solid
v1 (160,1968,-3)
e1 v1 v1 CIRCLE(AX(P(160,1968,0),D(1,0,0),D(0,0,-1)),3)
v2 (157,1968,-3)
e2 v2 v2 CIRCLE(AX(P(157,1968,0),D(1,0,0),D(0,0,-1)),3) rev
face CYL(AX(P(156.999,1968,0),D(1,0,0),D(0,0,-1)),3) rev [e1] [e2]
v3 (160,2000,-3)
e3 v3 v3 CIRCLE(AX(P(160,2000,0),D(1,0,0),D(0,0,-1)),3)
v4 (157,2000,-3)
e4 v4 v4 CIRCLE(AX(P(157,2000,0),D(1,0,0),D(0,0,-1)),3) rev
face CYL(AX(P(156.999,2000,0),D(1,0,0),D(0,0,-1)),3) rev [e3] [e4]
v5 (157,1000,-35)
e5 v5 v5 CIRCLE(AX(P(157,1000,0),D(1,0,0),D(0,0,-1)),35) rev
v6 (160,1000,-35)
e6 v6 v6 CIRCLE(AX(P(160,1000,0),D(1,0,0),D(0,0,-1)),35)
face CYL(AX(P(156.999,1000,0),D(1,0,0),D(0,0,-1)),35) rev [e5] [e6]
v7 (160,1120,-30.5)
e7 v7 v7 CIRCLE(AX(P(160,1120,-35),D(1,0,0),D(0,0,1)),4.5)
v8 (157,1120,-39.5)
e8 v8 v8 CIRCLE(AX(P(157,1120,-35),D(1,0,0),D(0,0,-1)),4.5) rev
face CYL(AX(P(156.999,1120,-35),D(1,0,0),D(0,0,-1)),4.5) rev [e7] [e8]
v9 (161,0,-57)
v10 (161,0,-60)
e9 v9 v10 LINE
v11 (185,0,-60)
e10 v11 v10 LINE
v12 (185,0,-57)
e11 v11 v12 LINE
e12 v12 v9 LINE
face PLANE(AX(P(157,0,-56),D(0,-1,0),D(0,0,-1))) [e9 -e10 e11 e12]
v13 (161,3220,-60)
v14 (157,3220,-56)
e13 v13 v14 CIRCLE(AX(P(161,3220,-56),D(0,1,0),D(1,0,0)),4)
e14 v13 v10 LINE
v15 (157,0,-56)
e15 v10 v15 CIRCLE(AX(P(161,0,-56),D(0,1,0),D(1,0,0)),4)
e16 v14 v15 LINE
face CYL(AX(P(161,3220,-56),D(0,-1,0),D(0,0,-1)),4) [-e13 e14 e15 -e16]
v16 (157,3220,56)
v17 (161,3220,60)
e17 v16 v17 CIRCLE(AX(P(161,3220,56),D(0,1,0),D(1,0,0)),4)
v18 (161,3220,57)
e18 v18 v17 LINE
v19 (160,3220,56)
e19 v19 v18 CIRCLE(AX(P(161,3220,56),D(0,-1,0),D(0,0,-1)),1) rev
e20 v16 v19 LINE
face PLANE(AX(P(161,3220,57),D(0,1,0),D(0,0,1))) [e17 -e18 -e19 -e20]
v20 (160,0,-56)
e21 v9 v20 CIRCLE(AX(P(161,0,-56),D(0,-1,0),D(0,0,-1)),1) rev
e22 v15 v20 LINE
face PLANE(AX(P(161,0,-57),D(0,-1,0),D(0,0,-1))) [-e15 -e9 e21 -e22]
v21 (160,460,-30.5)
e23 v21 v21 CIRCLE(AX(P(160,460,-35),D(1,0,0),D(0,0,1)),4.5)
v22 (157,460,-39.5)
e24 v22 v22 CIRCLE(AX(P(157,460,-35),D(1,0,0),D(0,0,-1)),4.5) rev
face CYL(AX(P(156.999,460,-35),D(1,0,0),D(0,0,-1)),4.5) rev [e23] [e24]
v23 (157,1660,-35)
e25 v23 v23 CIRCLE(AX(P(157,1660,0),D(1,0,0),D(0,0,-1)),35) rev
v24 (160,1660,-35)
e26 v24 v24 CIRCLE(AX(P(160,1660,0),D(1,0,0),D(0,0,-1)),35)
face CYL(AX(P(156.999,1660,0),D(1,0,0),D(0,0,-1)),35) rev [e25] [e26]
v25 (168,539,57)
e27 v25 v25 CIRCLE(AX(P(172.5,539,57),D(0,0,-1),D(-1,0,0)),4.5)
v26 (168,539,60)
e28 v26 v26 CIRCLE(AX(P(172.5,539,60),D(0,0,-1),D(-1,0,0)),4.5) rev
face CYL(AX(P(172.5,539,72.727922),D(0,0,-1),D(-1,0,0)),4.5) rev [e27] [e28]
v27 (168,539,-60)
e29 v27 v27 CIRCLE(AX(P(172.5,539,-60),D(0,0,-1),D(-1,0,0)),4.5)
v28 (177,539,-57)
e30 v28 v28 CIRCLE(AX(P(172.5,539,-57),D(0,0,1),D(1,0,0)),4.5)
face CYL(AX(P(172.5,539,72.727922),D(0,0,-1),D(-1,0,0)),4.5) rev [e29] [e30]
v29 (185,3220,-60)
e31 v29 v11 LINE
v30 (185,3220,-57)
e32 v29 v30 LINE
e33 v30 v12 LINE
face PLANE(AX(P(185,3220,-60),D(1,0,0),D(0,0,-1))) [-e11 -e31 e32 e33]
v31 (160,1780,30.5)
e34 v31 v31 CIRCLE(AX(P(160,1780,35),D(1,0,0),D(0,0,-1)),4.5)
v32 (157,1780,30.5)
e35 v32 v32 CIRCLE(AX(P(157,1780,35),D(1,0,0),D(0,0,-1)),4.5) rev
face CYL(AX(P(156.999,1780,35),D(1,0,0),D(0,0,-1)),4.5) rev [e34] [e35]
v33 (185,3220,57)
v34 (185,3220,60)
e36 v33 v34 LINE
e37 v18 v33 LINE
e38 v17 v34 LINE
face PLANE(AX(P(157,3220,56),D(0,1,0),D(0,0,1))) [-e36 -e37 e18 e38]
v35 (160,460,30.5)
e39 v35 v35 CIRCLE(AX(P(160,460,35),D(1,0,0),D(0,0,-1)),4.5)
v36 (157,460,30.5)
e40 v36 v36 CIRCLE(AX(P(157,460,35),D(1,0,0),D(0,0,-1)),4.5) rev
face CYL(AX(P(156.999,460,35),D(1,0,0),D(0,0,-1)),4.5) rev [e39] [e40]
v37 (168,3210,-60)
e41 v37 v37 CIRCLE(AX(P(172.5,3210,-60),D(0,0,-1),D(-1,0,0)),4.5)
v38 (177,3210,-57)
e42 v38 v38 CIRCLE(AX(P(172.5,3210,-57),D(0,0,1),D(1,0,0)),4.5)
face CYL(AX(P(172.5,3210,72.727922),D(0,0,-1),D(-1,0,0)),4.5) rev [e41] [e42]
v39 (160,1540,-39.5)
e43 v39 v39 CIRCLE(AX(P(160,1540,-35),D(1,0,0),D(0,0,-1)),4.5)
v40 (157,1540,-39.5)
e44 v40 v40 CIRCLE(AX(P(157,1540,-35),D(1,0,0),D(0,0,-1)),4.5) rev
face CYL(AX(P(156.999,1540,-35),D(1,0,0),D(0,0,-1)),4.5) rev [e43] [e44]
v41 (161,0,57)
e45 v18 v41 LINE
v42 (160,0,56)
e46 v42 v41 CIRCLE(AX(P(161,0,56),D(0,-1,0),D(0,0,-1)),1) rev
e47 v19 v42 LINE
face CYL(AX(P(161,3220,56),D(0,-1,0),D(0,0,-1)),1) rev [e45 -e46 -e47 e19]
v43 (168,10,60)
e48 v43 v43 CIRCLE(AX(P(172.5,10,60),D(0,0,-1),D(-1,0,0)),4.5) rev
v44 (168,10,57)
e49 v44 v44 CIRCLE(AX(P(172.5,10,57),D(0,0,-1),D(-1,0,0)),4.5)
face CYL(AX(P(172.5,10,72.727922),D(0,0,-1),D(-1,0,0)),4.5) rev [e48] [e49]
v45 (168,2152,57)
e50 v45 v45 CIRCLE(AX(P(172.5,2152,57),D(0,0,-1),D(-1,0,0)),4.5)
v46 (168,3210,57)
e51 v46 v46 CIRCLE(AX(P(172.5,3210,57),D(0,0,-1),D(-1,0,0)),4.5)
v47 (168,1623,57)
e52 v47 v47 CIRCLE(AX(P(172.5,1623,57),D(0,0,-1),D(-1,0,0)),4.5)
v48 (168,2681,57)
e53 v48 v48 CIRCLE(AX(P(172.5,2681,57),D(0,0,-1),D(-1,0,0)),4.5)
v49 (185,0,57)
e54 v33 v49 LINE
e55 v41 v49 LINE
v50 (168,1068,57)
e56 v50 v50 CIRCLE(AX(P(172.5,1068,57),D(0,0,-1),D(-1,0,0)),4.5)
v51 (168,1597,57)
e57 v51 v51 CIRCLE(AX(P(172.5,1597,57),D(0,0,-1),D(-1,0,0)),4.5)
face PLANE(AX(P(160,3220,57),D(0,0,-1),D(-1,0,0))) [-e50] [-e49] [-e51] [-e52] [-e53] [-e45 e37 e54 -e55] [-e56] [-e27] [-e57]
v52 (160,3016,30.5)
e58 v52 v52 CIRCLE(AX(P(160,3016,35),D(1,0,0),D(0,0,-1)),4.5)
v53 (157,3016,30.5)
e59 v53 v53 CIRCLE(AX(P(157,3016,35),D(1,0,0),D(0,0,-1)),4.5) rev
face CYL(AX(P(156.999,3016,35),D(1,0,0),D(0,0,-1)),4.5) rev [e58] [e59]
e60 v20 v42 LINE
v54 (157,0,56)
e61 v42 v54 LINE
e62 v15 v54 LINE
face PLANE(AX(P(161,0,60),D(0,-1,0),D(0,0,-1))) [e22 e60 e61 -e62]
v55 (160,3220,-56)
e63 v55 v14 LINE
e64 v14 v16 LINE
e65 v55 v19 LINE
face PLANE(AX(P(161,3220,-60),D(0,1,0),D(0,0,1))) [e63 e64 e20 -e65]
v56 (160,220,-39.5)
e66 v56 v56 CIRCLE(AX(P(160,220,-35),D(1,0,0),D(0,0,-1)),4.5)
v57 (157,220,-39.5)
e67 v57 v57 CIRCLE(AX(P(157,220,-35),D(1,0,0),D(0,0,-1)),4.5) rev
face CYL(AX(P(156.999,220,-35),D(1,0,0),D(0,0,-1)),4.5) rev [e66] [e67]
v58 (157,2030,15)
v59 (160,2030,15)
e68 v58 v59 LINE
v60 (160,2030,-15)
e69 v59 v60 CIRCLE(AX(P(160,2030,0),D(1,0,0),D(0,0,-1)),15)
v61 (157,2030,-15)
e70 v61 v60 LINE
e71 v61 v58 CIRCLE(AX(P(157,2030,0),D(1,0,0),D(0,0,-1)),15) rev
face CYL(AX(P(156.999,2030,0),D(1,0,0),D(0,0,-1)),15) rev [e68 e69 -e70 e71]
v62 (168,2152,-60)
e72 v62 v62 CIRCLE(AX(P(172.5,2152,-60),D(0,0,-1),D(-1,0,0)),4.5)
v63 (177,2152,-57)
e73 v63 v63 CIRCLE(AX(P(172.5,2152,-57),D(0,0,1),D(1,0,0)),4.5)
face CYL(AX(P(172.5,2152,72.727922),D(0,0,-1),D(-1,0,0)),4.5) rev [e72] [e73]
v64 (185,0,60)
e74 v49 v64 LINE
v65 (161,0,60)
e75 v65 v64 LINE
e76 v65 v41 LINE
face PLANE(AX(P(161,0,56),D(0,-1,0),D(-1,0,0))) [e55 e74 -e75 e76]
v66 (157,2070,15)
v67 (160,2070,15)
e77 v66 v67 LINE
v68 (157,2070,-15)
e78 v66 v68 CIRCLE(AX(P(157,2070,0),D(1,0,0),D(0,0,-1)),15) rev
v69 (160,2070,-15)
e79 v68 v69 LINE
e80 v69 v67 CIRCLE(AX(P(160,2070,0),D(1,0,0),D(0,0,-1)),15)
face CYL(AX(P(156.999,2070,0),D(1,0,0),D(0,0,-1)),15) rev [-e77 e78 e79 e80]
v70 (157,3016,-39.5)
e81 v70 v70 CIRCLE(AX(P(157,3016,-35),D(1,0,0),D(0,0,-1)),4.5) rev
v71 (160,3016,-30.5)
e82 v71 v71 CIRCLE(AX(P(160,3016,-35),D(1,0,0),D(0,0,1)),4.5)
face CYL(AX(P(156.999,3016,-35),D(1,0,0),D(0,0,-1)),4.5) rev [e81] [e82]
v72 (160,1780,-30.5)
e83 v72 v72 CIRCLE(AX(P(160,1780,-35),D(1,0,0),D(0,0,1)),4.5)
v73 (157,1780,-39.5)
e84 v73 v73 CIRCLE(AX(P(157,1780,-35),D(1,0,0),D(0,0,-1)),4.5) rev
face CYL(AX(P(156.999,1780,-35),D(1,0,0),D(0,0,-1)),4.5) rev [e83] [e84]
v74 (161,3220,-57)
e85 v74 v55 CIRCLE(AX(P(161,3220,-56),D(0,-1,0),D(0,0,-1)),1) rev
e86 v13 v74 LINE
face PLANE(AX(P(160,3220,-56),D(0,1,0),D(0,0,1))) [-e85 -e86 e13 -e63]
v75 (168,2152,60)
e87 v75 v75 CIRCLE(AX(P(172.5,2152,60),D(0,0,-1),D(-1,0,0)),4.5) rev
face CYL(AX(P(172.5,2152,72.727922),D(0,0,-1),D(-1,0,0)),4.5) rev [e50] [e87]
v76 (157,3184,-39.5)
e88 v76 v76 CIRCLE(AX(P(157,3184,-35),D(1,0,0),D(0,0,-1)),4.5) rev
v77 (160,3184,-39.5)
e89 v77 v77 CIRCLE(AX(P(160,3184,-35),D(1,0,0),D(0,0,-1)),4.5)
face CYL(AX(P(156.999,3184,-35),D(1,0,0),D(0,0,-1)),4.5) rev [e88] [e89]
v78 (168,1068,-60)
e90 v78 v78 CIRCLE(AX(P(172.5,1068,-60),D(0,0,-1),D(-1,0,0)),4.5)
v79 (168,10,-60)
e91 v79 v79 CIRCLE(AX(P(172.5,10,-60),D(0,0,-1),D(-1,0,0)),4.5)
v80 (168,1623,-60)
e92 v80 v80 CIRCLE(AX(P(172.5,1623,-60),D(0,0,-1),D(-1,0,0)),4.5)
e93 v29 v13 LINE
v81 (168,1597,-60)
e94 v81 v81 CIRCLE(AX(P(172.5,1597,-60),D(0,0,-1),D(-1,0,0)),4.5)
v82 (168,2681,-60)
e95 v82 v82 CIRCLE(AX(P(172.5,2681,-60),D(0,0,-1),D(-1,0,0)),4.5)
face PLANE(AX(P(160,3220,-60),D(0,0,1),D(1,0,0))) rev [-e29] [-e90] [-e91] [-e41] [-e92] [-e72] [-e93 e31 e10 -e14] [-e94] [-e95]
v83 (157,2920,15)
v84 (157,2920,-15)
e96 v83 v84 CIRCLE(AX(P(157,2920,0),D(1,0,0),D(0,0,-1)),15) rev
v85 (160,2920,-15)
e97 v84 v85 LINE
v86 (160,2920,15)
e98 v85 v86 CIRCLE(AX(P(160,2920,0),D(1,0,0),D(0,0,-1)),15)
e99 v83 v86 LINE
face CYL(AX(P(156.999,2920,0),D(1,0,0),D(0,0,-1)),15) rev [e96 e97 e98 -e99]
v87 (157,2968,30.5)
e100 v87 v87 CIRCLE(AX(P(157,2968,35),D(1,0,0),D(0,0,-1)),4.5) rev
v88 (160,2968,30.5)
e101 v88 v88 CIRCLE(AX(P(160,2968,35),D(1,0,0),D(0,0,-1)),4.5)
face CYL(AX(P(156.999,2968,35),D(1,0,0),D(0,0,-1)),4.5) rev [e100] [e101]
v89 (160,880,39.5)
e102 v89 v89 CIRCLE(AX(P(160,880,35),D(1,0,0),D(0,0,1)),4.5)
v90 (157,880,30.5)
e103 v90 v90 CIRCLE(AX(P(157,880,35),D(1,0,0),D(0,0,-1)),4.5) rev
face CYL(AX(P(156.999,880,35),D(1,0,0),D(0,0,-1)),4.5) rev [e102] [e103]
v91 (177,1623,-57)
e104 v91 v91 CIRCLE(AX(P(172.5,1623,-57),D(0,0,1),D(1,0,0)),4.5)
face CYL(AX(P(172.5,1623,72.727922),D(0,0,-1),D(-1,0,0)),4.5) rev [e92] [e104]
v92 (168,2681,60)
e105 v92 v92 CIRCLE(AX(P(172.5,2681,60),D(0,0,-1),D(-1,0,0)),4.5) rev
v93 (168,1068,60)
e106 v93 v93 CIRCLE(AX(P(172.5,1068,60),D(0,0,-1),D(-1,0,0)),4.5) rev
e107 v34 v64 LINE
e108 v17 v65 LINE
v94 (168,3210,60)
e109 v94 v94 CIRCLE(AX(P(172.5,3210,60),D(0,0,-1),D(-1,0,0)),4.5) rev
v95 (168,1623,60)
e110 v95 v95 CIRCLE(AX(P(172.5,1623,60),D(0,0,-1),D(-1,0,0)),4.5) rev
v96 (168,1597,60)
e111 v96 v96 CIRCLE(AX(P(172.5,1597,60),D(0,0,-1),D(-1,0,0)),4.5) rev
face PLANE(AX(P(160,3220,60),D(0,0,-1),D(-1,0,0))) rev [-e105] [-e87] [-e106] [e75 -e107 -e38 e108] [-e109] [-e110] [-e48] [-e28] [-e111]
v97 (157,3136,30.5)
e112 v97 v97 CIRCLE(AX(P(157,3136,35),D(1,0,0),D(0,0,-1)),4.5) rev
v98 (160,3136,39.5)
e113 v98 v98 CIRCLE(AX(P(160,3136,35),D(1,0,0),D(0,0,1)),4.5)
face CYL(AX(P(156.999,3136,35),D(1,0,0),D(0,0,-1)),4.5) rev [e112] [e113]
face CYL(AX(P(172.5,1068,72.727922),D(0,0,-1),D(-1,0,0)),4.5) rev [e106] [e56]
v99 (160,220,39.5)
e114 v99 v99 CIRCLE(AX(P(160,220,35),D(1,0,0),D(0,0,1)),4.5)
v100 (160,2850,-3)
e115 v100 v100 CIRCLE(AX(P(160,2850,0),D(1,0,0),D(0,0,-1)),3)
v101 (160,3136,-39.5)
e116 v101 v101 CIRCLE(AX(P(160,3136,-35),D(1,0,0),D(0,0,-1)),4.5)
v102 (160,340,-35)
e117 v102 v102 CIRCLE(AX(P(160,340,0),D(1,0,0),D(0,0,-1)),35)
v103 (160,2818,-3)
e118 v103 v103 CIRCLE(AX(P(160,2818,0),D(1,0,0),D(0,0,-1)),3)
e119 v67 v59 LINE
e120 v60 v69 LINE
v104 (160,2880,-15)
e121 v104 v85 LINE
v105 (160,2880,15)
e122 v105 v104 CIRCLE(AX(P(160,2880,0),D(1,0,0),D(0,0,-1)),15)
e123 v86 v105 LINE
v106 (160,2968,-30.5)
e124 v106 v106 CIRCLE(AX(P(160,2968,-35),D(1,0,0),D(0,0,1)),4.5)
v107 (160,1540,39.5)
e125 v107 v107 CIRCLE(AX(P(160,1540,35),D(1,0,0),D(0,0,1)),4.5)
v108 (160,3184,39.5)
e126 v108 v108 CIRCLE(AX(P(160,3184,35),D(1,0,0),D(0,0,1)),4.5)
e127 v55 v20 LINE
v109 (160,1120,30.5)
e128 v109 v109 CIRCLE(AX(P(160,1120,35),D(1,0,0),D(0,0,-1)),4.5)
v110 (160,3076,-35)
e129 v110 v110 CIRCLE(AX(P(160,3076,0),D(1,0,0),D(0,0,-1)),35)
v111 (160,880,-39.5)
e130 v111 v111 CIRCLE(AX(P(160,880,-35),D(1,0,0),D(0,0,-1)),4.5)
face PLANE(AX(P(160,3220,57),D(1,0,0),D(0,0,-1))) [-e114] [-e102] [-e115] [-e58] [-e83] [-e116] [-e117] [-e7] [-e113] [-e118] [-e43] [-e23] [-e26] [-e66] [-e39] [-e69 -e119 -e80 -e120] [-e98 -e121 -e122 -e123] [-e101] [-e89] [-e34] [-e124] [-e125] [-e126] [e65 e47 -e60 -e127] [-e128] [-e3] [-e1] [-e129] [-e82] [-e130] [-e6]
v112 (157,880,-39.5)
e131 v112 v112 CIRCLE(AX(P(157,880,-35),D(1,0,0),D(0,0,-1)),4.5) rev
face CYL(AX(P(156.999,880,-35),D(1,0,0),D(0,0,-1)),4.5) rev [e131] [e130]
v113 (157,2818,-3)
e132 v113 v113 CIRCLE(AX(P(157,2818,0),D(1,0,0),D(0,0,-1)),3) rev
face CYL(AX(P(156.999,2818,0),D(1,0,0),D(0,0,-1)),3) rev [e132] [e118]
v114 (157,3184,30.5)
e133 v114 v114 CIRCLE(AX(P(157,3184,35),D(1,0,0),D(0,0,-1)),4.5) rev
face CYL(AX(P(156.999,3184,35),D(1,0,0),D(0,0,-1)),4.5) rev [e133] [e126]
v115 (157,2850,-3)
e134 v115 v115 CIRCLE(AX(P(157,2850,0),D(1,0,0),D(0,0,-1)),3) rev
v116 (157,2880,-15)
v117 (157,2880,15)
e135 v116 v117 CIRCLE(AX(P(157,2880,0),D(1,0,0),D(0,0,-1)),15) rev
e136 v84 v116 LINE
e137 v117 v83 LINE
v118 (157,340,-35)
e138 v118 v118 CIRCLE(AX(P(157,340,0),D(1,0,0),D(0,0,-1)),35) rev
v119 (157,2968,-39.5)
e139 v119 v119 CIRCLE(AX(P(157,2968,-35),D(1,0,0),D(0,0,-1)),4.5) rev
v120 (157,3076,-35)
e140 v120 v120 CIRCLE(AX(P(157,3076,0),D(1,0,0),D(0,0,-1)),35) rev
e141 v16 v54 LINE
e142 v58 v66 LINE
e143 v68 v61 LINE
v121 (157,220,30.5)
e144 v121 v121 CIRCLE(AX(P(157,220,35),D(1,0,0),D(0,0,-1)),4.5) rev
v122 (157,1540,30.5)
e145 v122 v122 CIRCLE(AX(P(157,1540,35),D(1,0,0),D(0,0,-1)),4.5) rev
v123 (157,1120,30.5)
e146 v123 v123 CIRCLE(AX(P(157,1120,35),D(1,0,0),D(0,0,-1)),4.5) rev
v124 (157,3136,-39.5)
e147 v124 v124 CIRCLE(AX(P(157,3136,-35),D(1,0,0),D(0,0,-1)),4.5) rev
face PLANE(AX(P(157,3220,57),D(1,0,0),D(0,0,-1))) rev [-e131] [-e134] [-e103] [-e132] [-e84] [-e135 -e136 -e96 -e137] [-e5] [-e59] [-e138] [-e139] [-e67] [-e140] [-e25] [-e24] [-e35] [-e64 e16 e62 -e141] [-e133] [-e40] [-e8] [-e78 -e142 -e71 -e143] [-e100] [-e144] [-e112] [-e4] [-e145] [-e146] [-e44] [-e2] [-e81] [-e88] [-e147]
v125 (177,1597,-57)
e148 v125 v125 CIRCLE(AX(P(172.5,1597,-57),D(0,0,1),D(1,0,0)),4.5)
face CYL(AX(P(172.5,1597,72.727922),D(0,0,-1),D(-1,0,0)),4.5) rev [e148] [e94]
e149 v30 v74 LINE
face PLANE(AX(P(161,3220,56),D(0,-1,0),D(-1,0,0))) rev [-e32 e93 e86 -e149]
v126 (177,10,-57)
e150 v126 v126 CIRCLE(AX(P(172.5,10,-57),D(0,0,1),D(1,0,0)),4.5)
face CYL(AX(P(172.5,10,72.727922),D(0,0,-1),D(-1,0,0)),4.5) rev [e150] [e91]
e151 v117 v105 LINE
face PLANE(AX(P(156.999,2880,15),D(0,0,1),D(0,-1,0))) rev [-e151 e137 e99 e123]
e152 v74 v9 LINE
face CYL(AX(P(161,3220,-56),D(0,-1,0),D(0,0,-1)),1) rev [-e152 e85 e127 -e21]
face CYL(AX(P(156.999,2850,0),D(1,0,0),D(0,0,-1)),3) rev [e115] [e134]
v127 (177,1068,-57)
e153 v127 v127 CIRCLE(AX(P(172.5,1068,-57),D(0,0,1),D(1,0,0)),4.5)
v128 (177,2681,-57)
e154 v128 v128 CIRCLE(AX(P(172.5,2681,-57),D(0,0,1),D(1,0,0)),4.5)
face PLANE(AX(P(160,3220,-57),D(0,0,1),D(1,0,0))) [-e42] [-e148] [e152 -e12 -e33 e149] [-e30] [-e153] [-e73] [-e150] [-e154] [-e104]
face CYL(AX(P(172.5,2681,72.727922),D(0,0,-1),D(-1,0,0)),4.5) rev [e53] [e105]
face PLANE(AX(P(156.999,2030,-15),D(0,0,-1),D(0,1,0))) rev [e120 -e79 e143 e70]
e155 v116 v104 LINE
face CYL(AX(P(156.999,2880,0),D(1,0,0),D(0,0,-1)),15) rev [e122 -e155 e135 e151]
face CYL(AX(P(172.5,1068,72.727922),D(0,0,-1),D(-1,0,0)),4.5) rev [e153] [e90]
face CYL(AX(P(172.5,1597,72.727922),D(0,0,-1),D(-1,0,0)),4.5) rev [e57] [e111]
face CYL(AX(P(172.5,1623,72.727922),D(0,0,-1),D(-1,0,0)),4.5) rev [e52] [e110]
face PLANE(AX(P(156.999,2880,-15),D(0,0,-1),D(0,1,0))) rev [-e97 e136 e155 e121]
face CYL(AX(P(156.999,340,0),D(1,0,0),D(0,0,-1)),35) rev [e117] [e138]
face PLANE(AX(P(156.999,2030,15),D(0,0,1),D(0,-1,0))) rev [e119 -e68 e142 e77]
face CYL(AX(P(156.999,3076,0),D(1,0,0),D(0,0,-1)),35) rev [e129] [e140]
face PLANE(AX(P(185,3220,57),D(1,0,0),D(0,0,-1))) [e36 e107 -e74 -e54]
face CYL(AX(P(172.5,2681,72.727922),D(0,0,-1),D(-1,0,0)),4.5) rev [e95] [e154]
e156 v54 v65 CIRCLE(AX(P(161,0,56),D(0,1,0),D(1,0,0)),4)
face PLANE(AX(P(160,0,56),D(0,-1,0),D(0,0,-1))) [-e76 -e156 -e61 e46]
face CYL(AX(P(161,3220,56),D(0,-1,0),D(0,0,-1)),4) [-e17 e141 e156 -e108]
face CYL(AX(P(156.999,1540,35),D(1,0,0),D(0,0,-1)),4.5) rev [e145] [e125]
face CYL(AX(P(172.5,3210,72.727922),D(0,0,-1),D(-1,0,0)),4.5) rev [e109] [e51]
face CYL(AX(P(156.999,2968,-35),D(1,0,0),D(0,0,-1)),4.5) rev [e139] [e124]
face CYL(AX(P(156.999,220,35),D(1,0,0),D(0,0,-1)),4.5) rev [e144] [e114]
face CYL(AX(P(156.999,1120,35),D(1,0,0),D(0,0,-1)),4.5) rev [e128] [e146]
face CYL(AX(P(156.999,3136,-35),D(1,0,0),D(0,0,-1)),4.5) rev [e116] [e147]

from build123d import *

# Parameters (mm, degrees)
BASE_FLANGE1_DEPTH = 3220
CUT_EXTRUDE1_REACH = 3222.656
SKETCH7_R          = 35
CUT_EXTRUDE2_REACH = 3222.656
SKETCH9_R          = 4.5
LPATTERN1_COUNT    = 3
LPATTERN1_PITCH    = 660
CUT_EXTRUDE3_REACH = 3222.656
SKETCH10_R         = 4.5
CUT_EXTRUDE6_REACH = 3222.656
SKETCH15_R         = 3
LPATTERN2_COUNT    = 2
LPATTERN2_PITCH    = 850
CUT_EXTRUDE7_REACH = 3229.542
SKETCH16_R         = 4.5
LPATTERN3_COUNT    = 4
LPATTERN3_PITCH    = 529


# Sheet-metal steps are written as plain solids
with BuildPart() as part:
    # Sketch2 → Base-Flange1 (new body)
    with BuildSketch(Plane(origin=(0, 0, 0), x_dir=(1, 0, 0), z_dir=(0, 1, 0))):
        with BuildLine():
            Line((185, -57), (161, -57))
            ThreePointArc((161, -57), (160.292893219, -56.707106781), (160, -56))
            Line((160, -56), (160, 56))
            ThreePointArc((160, 56), (160.292893219, 56.707106781), (161, 57))
            Line((161, 57), (185, 57))
            Line((185, 57), (185, 60))
            Line((185, 60), (161, 60))
            ThreePointArc((161, 60), (158.171572875, 58.828427125), (157, 56))
            Line((157, 56), (157, -56))
            ThreePointArc((157, -56), (158.171572875, -58.828427125), (161, -60))
            Line((161, -60), (185, -60))
            Line((185, -60), (185, -57))
        make_face()
    extrude(amount=BASE_FLANGE1_DEPTH)

    # Sketch7 → Cut-Extrude1 (cut, up to next)
    with BuildSketch(Plane(origin=(160, 0, 0), x_dir=(0, 0, -1), z_dir=(1, 0, 0)), mode=Mode.PRIVATE) as cut_extrude1_sk1:
        with Locations((0, 340)):
            Circle(SKETCH7_R)
    cut_extrude1_tool1 = extrude(cut_extrude1_sk1.sketch, amount=-CUT_EXTRUDE1_REACH, mode=Mode.PRIVATE) & part.part
    # Sketch7 → Cut-Extrude1 (cut, up to next)
    with BuildSketch(Plane(origin=(160, 0, 0), x_dir=(0, 0, -1), z_dir=(1, 0, 0)), mode=Mode.PRIVATE) as cut_extrude1_sk2:
        with Locations((0, 1000)):
            Circle(SKETCH7_R)
    cut_extrude1_tool2 = extrude(cut_extrude1_sk2.sketch, amount=-CUT_EXTRUDE1_REACH, mode=Mode.PRIVATE) & part.part
    # Sketch7 → Cut-Extrude1 (cut, up to next)
    with BuildSketch(Plane(origin=(160, 0, 0), x_dir=(0, 0, -1), z_dir=(1, 0, 0)), mode=Mode.PRIVATE) as cut_extrude1_sk3:
        with Locations((0, 1660)):
            Circle(SKETCH7_R)
    cut_extrude1_tool3 = extrude(cut_extrude1_sk3.sketch, amount=-CUT_EXTRUDE1_REACH, mode=Mode.PRIVATE) & part.part
    # Sketch7 → Cut-Extrude1 (cut, up to next)
    with BuildSketch(Plane(origin=(160, 0, 0), x_dir=(0, 0, -1), z_dir=(1, 0, 0)), mode=Mode.PRIVATE) as cut_extrude1_sk4:
        with Locations((0, 3076)):
            Circle(SKETCH7_R)
    cut_extrude1_tool4 = extrude(cut_extrude1_sk4.sketch, amount=-CUT_EXTRUDE1_REACH, mode=Mode.PRIVATE) & part.part
    add(cut_extrude1_tool1.solids().sort_by_distance((160, 340, 0))[0], mode=Mode.SUBTRACT)
    add(cut_extrude1_tool2.solids().sort_by_distance((160, 1000, 0))[0], mode=Mode.SUBTRACT)
    add(cut_extrude1_tool3.solids().sort_by_distance((160, 1660, 0))[0], mode=Mode.SUBTRACT)
    add(cut_extrude1_tool4.solids().sort_by_distance((160, 3076, 0))[0], mode=Mode.SUBTRACT)

    # Sketch9 → Cut-Extrude2 (cut, up to next)
    with BuildSketch(Plane(origin=(160, 0, 0), x_dir=(0, 0, -1), z_dir=(1, 0, 0)), mode=Mode.PRIVATE) as cut_extrude2_sk1:
        with Locations((-35, 460)):
            Circle(SKETCH9_R)
    cut_extrude2_tool1 = extrude(cut_extrude2_sk1.sketch, amount=-CUT_EXTRUDE2_REACH, mode=Mode.PRIVATE) & part.part
    # Sketch9 → Cut-Extrude2 (cut, up to next)
    with BuildSketch(Plane(origin=(160, 0, 0), x_dir=(0, 0, -1), z_dir=(1, 0, 0)), mode=Mode.PRIVATE) as cut_extrude2_sk2:
        with Locations((35, 460)):
            Circle(SKETCH9_R)
    cut_extrude2_tool2 = extrude(cut_extrude2_sk2.sketch, amount=-CUT_EXTRUDE2_REACH, mode=Mode.PRIVATE) & part.part
    # Sketch9 → Cut-Extrude2 (cut, up to next)
    with BuildSketch(Plane(origin=(160, 0, 0), x_dir=(0, 0, -1), z_dir=(1, 0, 0)), mode=Mode.PRIVATE) as cut_extrude2_sk3:
        with Locations((-35, 220)):
            Circle(SKETCH9_R)
    cut_extrude2_tool3 = extrude(cut_extrude2_sk3.sketch, amount=-CUT_EXTRUDE2_REACH, mode=Mode.PRIVATE) & part.part
    # Sketch9 → Cut-Extrude2 (cut, up to next)
    with BuildSketch(Plane(origin=(160, 0, 0), x_dir=(0, 0, -1), z_dir=(1, 0, 0)), mode=Mode.PRIVATE) as cut_extrude2_sk4:
        with Locations((35, 220)):
            Circle(SKETCH9_R)
    cut_extrude2_tool4 = extrude(cut_extrude2_sk4.sketch, amount=-CUT_EXTRUDE2_REACH, mode=Mode.PRIVATE) & part.part
    cut_extrude2_1 = cut_extrude2_tool1.solids().sort_by_distance((160, 460, 35))[0]
    add(cut_extrude2_1, mode=Mode.SUBTRACT)
    cut_extrude2_2 = cut_extrude2_tool2.solids().sort_by_distance((160, 460, -35))[0]
    add(cut_extrude2_2, mode=Mode.SUBTRACT)
    cut_extrude2_3 = cut_extrude2_tool3.solids().sort_by_distance((160, 220, 35))[0]
    add(cut_extrude2_3, mode=Mode.SUBTRACT)
    cut_extrude2_4 = cut_extrude2_tool4.solids().sort_by_distance((160, 220, -35))[0]
    add(cut_extrude2_4, mode=Mode.SUBTRACT)
    cut_extrude2 = cut_extrude2_1 + cut_extrude2_2 + cut_extrude2_3 + cut_extrude2_4  # Cut-Extrude2 as one shape, for the pattern or mirror that repeats it

    # LPattern1: Cut-Extrude2 ×3
    with Locations(*[(0, i * LPATTERN1_PITCH, 0) for i in range(1, LPATTERN1_COUNT)]):
        add(cut_extrude2, mode=Mode.SUBTRACT)

    # Sketch10 → Cut-Extrude3 (cut, up to next)
    with BuildSketch(Plane(origin=(160, 0, 0), x_dir=(0, 0, -1), z_dir=(1, 0, 0)), mode=Mode.PRIVATE) as cut_extrude3_sk1:
        with Locations((-35, 3016)):
            Circle(SKETCH10_R)
    cut_extrude3_tool1 = extrude(cut_extrude3_sk1.sketch, amount=-CUT_EXTRUDE3_REACH, mode=Mode.PRIVATE) & part.part
    # Sketch10 → Cut-Extrude3 (cut, up to next)
    with BuildSketch(Plane(origin=(160, 0, 0), x_dir=(0, 0, -1), z_dir=(1, 0, 0)), mode=Mode.PRIVATE) as cut_extrude3_sk2:
        with Locations((35, 3016)):
            Circle(SKETCH10_R)
    cut_extrude3_tool2 = extrude(cut_extrude3_sk2.sketch, amount=-CUT_EXTRUDE3_REACH, mode=Mode.PRIVATE) & part.part
    # Sketch10 → Cut-Extrude3 (cut, up to next)
    with BuildSketch(Plane(origin=(160, 0, 0), x_dir=(0, 0, -1), z_dir=(1, 0, 0)), mode=Mode.PRIVATE) as cut_extrude3_sk3:
        with Locations((-35, 3136)):
            Circle(SKETCH10_R)
    cut_extrude3_tool3 = extrude(cut_extrude3_sk3.sketch, amount=-CUT_EXTRUDE3_REACH, mode=Mode.PRIVATE) & part.part
    # Sketch10 → Cut-Extrude3 (cut, up to next)
    with BuildSketch(Plane(origin=(160, 0, 0), x_dir=(0, 0, -1), z_dir=(1, 0, 0)), mode=Mode.PRIVATE) as cut_extrude3_sk4:
        with Locations((35, 3136)):
            Circle(SKETCH10_R)
    cut_extrude3_tool4 = extrude(cut_extrude3_sk4.sketch, amount=-CUT_EXTRUDE3_REACH, mode=Mode.PRIVATE) & part.part
    # Sketch10 → Cut-Extrude3 (cut, up to next)
    with BuildSketch(Plane(origin=(160, 0, 0), x_dir=(0, 0, -1), z_dir=(1, 0, 0)), mode=Mode.PRIVATE) as cut_extrude3_sk5:
        with Locations((-35, 3184)):
            Circle(SKETCH10_R)
    cut_extrude3_tool5 = extrude(cut_extrude3_sk5.sketch, amount=-CUT_EXTRUDE3_REACH, mode=Mode.PRIVATE) & part.part
    # Sketch10 → Cut-Extrude3 (cut, up to next)
    with BuildSketch(Plane(origin=(160, 0, 0), x_dir=(0, 0, -1), z_dir=(1, 0, 0)), mode=Mode.PRIVATE) as cut_extrude3_sk6:
        with Locations((35, 3184)):
            Circle(SKETCH10_R)
    cut_extrude3_tool6 = extrude(cut_extrude3_sk6.sketch, amount=-CUT_EXTRUDE3_REACH, mode=Mode.PRIVATE) & part.part
    # Sketch10 → Cut-Extrude3 (cut, up to next)
    with BuildSketch(Plane(origin=(160, 0, 0), x_dir=(0, 0, -1), z_dir=(1, 0, 0)), mode=Mode.PRIVATE) as cut_extrude3_sk7:
        with Locations((-35, 2968)):
            Circle(SKETCH10_R)
    cut_extrude3_tool7 = extrude(cut_extrude3_sk7.sketch, amount=-CUT_EXTRUDE3_REACH, mode=Mode.PRIVATE) & part.part
    # Sketch10 → Cut-Extrude3 (cut, up to next)
    with BuildSketch(Plane(origin=(160, 0, 0), x_dir=(0, 0, -1), z_dir=(1, 0, 0)), mode=Mode.PRIVATE) as cut_extrude3_sk8:
        with Locations((35, 2968)):
            Circle(SKETCH10_R)
    cut_extrude3_tool8 = extrude(cut_extrude3_sk8.sketch, amount=-CUT_EXTRUDE3_REACH, mode=Mode.PRIVATE) & part.part
    add(cut_extrude3_tool1.solids().sort_by_distance((160, 3016, 35))[0], mode=Mode.SUBTRACT)
    add(cut_extrude3_tool2.solids().sort_by_distance((160, 3016, -35))[0], mode=Mode.SUBTRACT)
    add(cut_extrude3_tool3.solids().sort_by_distance((160, 3136, 35))[0], mode=Mode.SUBTRACT)
    add(cut_extrude3_tool4.solids().sort_by_distance((160, 3136, -35))[0], mode=Mode.SUBTRACT)
    add(cut_extrude3_tool5.solids().sort_by_distance((160, 3184, 35))[0], mode=Mode.SUBTRACT)
    add(cut_extrude3_tool6.solids().sort_by_distance((160, 3184, -35))[0], mode=Mode.SUBTRACT)
    add(cut_extrude3_tool7.solids().sort_by_distance((160, 2968, 35))[0], mode=Mode.SUBTRACT)
    add(cut_extrude3_tool8.solids().sort_by_distance((160, 2968, -35))[0], mode=Mode.SUBTRACT)

    # Sketch15 → Cut-Extrude6 (cut, up to next)
    with BuildSketch(Plane(origin=(160, 0, 0), x_dir=(0, 0, -1), z_dir=(1, 0, 0)), mode=Mode.PRIVATE) as cut_extrude6_sk1:
        with Locations((0, 2000)):
            Circle(SKETCH15_R)
    cut_extrude6_tool1 = extrude(cut_extrude6_sk1.sketch, amount=-CUT_EXTRUDE6_REACH, mode=Mode.PRIVATE) & part.part
    # Sketch15 → Cut-Extrude6 (cut, up to next)
    with BuildSketch(Plane(origin=(160, 0, 0), x_dir=(0, 0, -1), z_dir=(1, 0, 0)), mode=Mode.PRIVATE) as cut_extrude6_sk2:
        with Locations((0, 1968)):
            Circle(SKETCH15_R)
    cut_extrude6_tool2 = extrude(cut_extrude6_sk2.sketch, amount=-CUT_EXTRUDE6_REACH, mode=Mode.PRIVATE) & part.part
    # Sketch15 → Cut-Extrude6 (cut, up to next)
    with BuildSketch(Plane(origin=(160, 0, 0), x_dir=(0, 0, -1), z_dir=(1, 0, 0)), mode=Mode.PRIVATE) as cut_extrude6_sk3:
        with BuildLine():
            Line((-15, 2030), (-15, 2070))
            ThreePointArc((-15, 2070), (0, 2085), (15, 2070))
            Line((15, 2070), (15, 2030))
            ThreePointArc((15, 2030), (0, 2015), (-15, 2030))
        make_face()
    cut_extrude6_tool3 = extrude(cut_extrude6_sk3.sketch, amount=-CUT_EXTRUDE6_REACH, mode=Mode.PRIVATE) & part.part
    cut_extrude6_1 = cut_extrude6_tool1.solids().sort_by_distance((160, 2000, 0))[0]
    add(cut_extrude6_1, mode=Mode.SUBTRACT)
    cut_extrude6_2 = cut_extrude6_tool2.solids().sort_by_distance((160, 1968, 0))[0]
    add(cut_extrude6_2, mode=Mode.SUBTRACT)
    cut_extrude6_3 = cut_extrude6_tool3.solids().sort_by_distance((160, 2050, 0))[0]
    add(cut_extrude6_3, mode=Mode.SUBTRACT)
    cut_extrude6 = cut_extrude6_1 + cut_extrude6_2 + cut_extrude6_3  # Cut-Extrude6 as one shape, for the pattern or mirror that repeats it

    # LPattern2: Cut-Extrude6 ×2
    with Locations(*[(0, i * LPATTERN2_PITCH, 0) for i in range(1, LPATTERN2_COUNT)]):
        add(cut_extrude6, mode=Mode.SUBTRACT)

    # Cut-Extrude7: up to this face of the body (flat: up to its plane)
    cut_extrude7_end = Plane(part.part.faces().sort_by_distance((173, 1610, 60))[0])
    # Sketch16 → Cut-Extrude7 (cut, up to the picked face)
    with BuildSketch(Plane(origin=(0, 0, -60), x_dir=(-1, 0, 0), z_dir=(0, 0, -1)), mode=Mode.PRIVATE) as cut_extrude7_sk1:
        with Locations((-172.5, 10)):
            Circle(SKETCH16_R)
    cut_extrude7_tool1 = split(extrude(cut_extrude7_sk1.sketch, amount=-CUT_EXTRUDE7_REACH, mode=Mode.PRIVATE), bisect_by=cut_extrude7_end, keep=Keep.BOTH, mode=Mode.PRIVATE)
    # Sketch16 → Cut-Extrude7 (cut, up to the picked face)
    with BuildSketch(Plane(origin=(0, 0, -60), x_dir=(-1, 0, 0), z_dir=(0, 0, -1)), mode=Mode.PRIVATE) as cut_extrude7_sk2:
        with Locations((-172.5, 1623)):
            Circle(SKETCH16_R)
    cut_extrude7_tool2 = split(extrude(cut_extrude7_sk2.sketch, amount=-CUT_EXTRUDE7_REACH, mode=Mode.PRIVATE), bisect_by=cut_extrude7_end, keep=Keep.BOTH, mode=Mode.PRIVATE)
    cut_extrude7_1 = cut_extrude7_tool1.solids().sort_by(Axis((172.5, 10, -60), (0, 0, 1)))[0]
    add(cut_extrude7_1, mode=Mode.SUBTRACT)
    cut_extrude7_2 = cut_extrude7_tool2.solids().sort_by(Axis((172.5, 1623, -60), (0, 0, 1)))[0]
    add(cut_extrude7_2, mode=Mode.SUBTRACT)
    cut_extrude7 = cut_extrude7_1 + cut_extrude7_2  # Cut-Extrude7 as one shape, for the pattern or mirror that repeats it

    # LPattern3: Cut-Extrude7 ×4
    with Locations(*[(0, i * LPATTERN3_PITCH, 0) for i in range(1, LPATTERN3_COUNT)]):
        add(cut_extrude7, mode=Mode.SUBTRACT)


solid = part.part
